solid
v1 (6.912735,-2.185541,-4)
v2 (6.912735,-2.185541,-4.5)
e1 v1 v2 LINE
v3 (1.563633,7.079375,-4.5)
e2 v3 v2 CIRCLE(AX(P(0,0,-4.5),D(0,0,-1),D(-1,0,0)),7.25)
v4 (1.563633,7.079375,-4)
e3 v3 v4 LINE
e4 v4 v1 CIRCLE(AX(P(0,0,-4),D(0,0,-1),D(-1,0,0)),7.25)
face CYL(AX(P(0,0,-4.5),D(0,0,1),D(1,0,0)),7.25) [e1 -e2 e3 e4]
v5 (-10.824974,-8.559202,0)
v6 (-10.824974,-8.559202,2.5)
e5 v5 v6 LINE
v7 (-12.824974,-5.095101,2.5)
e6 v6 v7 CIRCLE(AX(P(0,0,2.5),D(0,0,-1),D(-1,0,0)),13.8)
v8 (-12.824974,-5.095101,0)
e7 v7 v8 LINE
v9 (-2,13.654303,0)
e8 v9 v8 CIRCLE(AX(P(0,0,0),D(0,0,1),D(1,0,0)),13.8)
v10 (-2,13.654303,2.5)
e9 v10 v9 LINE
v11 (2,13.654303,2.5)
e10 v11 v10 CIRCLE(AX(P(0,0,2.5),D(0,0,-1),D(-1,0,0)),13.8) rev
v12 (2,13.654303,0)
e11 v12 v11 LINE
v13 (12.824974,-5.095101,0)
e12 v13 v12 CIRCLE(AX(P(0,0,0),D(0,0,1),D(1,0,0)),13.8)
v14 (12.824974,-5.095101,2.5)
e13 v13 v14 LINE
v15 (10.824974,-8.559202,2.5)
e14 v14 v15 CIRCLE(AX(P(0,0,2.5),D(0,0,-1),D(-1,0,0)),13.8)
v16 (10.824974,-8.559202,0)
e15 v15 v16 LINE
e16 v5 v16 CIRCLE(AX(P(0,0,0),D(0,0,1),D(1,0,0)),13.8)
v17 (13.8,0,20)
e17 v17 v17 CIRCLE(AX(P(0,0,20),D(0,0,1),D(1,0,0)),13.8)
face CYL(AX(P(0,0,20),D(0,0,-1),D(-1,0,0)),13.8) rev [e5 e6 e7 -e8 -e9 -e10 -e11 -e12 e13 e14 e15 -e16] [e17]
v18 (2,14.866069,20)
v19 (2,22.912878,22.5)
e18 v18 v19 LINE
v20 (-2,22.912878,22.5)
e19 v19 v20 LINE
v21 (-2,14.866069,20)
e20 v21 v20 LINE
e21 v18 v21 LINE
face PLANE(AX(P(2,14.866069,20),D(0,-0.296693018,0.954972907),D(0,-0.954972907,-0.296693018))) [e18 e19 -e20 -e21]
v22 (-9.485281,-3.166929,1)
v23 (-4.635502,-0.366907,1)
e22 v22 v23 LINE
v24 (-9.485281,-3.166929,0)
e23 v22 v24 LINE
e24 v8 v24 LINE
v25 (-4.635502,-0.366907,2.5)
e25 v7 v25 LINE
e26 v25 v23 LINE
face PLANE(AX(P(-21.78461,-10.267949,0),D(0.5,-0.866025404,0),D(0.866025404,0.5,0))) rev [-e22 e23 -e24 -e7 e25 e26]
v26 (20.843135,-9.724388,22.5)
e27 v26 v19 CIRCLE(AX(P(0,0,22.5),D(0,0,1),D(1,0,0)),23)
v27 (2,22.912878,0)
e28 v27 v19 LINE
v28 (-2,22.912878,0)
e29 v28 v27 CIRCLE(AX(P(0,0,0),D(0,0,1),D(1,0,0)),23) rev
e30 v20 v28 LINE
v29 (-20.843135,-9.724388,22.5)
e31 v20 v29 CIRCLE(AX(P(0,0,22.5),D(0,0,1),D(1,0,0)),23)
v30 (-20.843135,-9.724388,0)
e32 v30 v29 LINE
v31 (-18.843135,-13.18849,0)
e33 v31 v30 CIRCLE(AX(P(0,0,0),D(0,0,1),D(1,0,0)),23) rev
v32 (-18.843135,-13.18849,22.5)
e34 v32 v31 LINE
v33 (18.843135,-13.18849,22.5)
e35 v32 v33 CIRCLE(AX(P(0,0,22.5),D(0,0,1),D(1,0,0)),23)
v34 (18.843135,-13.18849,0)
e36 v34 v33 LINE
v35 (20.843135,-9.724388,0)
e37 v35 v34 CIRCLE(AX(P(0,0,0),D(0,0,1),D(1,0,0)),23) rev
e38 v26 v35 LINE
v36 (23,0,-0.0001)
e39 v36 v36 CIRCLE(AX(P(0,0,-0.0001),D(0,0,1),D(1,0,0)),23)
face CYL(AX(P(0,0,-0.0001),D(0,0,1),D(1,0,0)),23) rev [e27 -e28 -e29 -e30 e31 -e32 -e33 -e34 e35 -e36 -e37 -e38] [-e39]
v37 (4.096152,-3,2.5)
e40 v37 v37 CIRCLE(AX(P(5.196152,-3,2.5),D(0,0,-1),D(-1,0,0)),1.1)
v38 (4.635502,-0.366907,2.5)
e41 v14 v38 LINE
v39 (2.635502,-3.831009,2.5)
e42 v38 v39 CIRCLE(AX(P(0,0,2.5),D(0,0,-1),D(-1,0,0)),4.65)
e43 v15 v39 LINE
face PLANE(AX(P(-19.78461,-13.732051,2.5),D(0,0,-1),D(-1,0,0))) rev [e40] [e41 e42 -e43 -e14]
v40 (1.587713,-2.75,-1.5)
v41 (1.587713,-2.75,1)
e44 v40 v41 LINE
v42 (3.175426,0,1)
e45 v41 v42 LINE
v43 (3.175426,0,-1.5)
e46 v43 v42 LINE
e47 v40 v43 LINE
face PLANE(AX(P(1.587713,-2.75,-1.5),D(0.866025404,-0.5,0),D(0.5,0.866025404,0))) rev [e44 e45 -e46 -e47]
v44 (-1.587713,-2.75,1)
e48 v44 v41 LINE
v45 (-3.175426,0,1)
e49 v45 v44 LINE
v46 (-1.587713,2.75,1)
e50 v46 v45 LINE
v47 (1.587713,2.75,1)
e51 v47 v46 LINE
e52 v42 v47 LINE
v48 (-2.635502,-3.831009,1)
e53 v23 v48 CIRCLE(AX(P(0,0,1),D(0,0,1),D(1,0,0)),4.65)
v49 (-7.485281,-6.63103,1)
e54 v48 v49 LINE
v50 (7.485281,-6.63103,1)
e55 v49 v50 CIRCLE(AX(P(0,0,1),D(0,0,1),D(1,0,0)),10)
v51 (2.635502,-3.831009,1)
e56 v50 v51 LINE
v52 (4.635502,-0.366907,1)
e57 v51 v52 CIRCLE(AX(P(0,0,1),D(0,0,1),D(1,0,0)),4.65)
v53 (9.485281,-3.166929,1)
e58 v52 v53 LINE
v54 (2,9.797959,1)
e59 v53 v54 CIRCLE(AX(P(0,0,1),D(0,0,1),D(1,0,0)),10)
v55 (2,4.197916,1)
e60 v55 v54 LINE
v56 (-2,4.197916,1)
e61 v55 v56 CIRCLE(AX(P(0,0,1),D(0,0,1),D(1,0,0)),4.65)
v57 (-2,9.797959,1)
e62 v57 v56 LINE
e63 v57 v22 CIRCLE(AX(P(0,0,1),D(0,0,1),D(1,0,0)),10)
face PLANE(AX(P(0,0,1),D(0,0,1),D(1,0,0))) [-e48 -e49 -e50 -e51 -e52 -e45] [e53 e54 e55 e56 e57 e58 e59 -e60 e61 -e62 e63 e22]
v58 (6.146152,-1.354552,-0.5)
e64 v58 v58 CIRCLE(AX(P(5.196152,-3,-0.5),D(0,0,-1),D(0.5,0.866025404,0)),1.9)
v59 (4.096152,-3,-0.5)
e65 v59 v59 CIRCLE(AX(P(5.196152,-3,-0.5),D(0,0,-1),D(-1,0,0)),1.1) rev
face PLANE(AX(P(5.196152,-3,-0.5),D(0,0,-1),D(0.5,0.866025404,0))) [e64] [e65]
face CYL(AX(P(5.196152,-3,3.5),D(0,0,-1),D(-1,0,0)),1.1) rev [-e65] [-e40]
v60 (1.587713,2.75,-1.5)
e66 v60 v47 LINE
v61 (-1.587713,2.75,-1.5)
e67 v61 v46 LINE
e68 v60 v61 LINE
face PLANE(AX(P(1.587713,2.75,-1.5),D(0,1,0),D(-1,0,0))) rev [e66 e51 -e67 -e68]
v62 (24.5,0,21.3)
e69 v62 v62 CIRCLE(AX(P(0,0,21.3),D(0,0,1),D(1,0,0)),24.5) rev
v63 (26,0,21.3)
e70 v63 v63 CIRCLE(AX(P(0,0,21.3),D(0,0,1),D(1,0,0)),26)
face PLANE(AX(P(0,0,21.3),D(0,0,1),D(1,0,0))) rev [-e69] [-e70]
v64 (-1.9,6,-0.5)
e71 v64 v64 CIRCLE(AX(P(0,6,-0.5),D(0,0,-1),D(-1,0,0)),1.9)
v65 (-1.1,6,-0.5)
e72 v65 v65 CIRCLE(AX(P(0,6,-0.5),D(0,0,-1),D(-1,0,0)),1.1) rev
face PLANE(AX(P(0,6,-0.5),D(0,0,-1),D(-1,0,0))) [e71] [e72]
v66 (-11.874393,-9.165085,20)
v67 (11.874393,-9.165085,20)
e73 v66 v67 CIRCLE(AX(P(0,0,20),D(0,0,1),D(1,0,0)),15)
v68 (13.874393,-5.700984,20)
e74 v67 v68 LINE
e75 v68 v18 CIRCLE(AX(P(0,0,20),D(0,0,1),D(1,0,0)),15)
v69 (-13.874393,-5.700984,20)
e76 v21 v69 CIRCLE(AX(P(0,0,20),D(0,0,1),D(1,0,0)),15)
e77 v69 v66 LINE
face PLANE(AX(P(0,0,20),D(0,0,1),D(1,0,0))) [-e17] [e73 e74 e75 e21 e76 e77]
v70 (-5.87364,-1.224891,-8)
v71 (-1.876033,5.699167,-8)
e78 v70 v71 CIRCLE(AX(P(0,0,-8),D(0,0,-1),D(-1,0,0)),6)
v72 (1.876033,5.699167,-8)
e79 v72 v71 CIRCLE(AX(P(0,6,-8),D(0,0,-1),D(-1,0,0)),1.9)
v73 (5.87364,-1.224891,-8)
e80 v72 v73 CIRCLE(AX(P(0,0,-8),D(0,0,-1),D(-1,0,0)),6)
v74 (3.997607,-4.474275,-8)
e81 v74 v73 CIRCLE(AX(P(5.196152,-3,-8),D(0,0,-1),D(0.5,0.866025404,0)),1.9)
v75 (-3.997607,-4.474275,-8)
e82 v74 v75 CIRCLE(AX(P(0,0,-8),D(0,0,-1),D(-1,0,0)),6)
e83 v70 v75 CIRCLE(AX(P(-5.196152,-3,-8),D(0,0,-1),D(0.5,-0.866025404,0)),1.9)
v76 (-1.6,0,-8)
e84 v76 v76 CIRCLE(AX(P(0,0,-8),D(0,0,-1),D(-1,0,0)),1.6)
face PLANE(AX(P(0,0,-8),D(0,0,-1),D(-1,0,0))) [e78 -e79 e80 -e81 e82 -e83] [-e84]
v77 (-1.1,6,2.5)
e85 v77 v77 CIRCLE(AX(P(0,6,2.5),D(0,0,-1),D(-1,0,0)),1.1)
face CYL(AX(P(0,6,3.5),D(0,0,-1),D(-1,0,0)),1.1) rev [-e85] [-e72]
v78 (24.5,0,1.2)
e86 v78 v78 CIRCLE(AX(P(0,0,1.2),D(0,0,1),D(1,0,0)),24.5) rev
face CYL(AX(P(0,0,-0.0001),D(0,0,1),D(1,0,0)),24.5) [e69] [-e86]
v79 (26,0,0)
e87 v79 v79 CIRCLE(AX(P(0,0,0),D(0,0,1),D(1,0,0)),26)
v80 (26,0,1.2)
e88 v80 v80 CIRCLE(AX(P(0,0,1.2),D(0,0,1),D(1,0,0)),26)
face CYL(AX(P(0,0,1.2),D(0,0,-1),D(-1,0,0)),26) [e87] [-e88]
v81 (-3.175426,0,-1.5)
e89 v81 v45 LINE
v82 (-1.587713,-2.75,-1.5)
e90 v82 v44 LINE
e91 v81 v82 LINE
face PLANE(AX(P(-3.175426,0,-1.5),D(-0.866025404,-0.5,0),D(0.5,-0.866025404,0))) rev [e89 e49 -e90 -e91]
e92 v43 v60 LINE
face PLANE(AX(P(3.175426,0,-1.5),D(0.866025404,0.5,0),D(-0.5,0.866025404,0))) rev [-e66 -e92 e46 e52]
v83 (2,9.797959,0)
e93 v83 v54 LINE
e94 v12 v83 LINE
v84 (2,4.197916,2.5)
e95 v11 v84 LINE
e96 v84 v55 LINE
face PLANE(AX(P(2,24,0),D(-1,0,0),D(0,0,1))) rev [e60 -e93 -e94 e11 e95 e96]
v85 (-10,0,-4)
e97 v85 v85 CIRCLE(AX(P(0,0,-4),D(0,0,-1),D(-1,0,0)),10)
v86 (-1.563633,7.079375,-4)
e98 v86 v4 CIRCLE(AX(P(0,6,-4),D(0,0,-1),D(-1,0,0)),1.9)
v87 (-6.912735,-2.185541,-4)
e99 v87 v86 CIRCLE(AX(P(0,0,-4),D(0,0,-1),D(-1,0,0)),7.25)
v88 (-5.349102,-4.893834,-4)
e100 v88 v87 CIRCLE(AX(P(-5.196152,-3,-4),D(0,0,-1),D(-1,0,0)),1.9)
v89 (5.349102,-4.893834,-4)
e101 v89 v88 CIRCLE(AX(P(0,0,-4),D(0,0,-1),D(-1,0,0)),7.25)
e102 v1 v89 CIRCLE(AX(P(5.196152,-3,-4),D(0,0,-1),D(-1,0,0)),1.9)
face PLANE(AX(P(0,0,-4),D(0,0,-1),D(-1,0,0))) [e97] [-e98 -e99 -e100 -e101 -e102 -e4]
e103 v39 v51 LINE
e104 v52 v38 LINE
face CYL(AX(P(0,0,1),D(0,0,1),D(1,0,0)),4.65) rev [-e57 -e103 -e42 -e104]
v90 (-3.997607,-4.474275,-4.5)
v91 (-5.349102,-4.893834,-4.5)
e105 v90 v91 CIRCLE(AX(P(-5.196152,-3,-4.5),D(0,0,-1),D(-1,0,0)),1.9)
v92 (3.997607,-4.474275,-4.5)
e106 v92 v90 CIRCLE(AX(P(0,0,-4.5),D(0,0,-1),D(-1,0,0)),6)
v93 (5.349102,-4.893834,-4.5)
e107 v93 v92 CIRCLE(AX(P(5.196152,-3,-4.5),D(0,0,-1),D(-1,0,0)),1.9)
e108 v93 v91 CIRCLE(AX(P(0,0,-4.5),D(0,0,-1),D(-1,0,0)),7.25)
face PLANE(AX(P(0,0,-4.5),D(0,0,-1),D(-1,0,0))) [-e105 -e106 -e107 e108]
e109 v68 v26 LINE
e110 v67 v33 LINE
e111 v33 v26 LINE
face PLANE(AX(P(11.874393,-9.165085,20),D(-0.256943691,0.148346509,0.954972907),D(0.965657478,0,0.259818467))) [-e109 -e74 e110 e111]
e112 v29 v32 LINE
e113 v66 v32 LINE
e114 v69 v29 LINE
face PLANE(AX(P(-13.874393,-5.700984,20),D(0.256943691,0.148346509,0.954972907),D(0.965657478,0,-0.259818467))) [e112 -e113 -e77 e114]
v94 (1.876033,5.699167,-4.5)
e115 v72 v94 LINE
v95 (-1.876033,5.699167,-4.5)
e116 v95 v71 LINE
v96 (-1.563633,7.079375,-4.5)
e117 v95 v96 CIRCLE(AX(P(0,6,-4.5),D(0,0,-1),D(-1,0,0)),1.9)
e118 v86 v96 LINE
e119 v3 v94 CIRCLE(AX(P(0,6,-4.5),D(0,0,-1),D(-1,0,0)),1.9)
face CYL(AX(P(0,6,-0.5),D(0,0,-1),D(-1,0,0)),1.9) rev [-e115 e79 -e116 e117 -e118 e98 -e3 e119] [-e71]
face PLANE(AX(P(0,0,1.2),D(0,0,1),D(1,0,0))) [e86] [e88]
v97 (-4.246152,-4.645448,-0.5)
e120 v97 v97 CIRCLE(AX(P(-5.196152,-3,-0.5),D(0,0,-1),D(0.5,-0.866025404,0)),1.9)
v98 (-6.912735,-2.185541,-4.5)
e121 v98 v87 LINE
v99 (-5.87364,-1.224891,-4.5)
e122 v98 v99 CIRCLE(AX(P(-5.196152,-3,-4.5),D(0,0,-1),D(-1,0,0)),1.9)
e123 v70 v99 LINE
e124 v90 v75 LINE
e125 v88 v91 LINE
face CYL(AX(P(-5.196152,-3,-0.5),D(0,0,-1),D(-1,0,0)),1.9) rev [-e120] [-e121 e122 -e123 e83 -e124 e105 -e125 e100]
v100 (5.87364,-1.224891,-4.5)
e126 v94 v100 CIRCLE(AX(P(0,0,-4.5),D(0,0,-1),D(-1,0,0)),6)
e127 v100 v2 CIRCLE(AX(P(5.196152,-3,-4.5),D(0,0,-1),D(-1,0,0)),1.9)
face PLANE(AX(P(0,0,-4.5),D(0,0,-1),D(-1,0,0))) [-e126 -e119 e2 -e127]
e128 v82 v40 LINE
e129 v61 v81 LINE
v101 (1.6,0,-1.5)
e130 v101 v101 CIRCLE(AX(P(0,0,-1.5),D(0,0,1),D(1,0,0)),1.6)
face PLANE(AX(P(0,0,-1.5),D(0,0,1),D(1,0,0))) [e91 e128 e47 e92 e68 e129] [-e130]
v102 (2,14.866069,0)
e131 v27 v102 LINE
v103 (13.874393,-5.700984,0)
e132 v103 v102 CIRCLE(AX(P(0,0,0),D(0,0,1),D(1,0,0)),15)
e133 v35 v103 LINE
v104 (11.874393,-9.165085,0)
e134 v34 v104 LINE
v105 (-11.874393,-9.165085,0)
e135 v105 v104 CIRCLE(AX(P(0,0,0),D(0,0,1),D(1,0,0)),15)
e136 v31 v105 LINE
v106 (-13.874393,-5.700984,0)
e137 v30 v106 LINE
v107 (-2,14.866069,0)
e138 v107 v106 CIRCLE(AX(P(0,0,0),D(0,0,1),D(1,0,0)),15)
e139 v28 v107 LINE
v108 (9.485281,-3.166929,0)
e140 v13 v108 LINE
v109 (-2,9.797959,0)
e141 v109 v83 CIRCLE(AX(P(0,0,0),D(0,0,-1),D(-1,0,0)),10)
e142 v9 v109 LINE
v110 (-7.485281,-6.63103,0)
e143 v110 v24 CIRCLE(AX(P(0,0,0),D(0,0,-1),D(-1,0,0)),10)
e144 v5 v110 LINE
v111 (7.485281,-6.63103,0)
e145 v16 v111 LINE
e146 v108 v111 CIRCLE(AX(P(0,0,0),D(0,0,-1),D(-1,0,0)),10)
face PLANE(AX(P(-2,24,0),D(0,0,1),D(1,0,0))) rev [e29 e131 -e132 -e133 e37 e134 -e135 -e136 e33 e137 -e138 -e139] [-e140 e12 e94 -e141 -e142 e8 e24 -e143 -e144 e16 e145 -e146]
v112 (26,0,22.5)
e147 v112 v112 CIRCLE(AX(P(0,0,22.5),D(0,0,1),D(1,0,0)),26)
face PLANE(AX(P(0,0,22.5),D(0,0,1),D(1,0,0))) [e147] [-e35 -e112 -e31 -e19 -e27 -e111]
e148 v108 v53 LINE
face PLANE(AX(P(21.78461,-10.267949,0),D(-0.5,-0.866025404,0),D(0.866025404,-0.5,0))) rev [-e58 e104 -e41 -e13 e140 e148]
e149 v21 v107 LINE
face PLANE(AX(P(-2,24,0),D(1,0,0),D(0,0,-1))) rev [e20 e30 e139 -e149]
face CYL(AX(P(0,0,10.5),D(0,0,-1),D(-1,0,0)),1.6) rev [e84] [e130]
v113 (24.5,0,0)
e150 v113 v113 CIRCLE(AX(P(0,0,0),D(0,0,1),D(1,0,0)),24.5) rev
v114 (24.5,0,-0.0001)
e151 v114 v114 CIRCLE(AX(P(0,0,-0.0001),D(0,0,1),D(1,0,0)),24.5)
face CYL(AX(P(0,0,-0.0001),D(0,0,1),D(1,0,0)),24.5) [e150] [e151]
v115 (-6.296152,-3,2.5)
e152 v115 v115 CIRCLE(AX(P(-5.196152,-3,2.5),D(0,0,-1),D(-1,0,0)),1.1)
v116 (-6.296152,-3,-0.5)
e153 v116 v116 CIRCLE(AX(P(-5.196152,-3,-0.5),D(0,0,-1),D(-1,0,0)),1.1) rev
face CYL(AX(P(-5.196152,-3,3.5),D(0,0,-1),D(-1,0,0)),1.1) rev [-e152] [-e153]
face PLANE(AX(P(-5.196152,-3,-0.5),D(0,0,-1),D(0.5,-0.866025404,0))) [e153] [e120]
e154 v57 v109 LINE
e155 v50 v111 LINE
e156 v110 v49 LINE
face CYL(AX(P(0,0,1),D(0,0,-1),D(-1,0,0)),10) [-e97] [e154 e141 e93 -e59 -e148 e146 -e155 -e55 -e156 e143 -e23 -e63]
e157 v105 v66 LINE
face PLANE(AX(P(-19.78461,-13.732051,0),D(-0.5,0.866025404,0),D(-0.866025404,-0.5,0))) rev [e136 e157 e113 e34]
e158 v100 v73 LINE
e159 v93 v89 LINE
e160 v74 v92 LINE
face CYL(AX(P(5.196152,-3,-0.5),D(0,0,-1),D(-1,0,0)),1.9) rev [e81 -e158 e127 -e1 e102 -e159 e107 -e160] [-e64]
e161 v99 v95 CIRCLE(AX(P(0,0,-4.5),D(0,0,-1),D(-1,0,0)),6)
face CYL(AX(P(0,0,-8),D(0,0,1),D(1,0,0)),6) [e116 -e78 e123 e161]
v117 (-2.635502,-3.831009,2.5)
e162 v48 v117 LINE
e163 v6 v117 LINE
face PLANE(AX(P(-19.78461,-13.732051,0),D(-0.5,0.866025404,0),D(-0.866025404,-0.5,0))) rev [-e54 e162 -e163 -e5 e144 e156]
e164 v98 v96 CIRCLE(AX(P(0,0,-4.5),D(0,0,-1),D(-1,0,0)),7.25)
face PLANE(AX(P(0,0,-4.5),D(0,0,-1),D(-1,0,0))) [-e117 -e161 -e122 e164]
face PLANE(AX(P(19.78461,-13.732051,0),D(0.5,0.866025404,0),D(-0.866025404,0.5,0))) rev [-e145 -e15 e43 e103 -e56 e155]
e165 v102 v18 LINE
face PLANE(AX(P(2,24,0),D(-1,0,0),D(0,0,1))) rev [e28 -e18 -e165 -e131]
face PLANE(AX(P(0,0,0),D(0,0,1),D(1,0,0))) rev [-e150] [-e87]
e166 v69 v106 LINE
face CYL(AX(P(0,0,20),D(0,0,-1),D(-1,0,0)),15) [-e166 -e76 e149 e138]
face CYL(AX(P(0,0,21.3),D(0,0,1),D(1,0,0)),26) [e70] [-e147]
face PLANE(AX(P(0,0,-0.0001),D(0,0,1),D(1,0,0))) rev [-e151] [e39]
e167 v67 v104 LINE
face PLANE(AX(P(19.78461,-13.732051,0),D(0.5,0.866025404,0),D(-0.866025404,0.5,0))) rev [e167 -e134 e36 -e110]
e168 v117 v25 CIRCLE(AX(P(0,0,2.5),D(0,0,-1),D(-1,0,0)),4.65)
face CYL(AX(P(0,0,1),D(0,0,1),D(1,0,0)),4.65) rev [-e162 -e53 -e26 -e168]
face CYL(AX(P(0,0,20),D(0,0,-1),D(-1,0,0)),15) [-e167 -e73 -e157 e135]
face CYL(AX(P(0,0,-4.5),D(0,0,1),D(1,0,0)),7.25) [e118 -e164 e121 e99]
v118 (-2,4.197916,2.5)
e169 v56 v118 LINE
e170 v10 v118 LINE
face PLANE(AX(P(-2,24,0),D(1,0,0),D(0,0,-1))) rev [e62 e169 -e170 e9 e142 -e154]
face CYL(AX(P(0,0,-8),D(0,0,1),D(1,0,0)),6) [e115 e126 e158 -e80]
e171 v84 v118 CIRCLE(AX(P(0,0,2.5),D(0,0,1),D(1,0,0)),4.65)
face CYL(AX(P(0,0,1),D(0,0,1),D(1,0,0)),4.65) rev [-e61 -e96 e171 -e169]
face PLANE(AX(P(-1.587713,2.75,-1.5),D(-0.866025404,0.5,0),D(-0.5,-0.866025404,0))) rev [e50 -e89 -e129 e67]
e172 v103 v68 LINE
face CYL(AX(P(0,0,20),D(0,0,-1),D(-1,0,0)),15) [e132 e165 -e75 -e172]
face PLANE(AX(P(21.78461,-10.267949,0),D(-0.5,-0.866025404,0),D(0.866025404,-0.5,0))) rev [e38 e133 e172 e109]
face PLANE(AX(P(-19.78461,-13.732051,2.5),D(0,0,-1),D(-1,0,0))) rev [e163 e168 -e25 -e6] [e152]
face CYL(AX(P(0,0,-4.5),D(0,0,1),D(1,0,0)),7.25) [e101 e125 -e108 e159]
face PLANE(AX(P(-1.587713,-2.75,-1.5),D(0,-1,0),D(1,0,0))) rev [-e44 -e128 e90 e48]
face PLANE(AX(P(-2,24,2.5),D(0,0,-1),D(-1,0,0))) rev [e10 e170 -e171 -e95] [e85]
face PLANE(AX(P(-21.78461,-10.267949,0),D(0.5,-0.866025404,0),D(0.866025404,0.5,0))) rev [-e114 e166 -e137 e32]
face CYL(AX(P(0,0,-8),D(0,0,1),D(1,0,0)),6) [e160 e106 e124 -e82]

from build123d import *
from build123d.topology import SkipClean

# Parameters (mm, degrees)
BOSS_EXTRUDE1_DEPTH      = 22.5
BOSS_EXTRUDE1_DEPTH_BACK = 0.0001
SKETCH1_R                = 24.5
SKETCH1_R_2              = 23
SKETCH4_R                = 26
SKETCH4_R_2              = 23
BOSS_EXTRUDE2_DEPTH      = 1.2
BOSS_EXTRUDE4_START      = -1.2
SKETCH7_R                = 26
SKETCH7_R_2              = 24.253874055
BOSS_EXTRUDE4_DEPTH      = 1.2
SKETCH8_R                = 15
SKETCH8_R_2              = 13.8
BOSS_EXTRUDE5_DEPTH      = 20
SKETCH9_R                = 10
BOSS_EXTRUDE6_DEPTH      = 1
SKETCH11_W               = 4
SKETCH11_H               = 2.5
BOSS_EXTRUDE8_DEPTH      = 24
SKETCH19_W               = 4
SKETCH19_H               = 9.350394366
BOSS_EXTRUDE9_DEPTH      = 20
SKETCH13_R               = 4.65
CUT_EXTRUDE7_DEPTH       = 1.5
CIRPATTERN2_COUNT        = 3
SKETCH21_R               = 4.65
CUT_EXTRUDE8_DEPTH       = 1.5
CIRPATTERN6_COUNT        = 3
SKETCH23_R               = 1.1
CUT_EXTRUDE9_DEPTH       = 3.5
CIRPATTERN8_COUNT        = 3
CUT_EXTRUDE11_DEPTH      = 4
CIRPATTERN9_COUNT        = 3
BOSS_EXTRUDE10_START     = 4
SKETCH27_R               = 10
BOSS_EXTRUDE10_DEPTH     = 4
SKETCH29_R               = 6
BOSS_EXTRUDE11_DEPTH     = 4
CUT_EXTRUDE12_START      = -13
SKETCH30_R               = 1.1
CUT_EXTRUDE12_DEPTH      = 13
CUT_EXTRUDE13_START      = -13
SKETCH31_R               = 1.1
CUT_EXTRUDE13_DEPTH      = 13
SKETCH32_R               = 1.9
CUT_EXTRUDE14_DEPTH      = 7.5
CUT_EXTRUDE15_DEPTH      = 2.5
SKETCH36_R               = 1.6
CUT_EXTRUDE16_DEPTH      = 18.5
SKETCH40_R               = 7.25
BOSS_EXTRUDE13_DEPTH     = 0.5
SKETCH36_4_R             = 1.6
CUT_EXTRUDE17_DEPTH      = 8.5
SKETCH32_3_R             = 1.9
CUT_EXTRUDE18_DEPTH      = 4.5
CIRPATTERN10_COUNT       = 3


with BuildPart() as part:
    # Sketch1 → Boss-Extrude1 (new, two sides: drawn at the far end of the back side and taken through both)
    with BuildSketch(Plane.XY.offset(-BOSS_EXTRUDE1_DEPTH_BACK)):
        Circle(SKETCH1_R)
        Circle(SKETCH1_R_2, mode=Mode.SUBTRACT)
    extrude(amount=BOSS_EXTRUDE1_DEPTH + BOSS_EXTRUDE1_DEPTH_BACK)

    # Sketch4 → Boss-Extrude2 (add)
    with SkipClean():  # the faces are left unmerged after this step: merging them gives an invalid solid
        with BuildSketch(Plane.XY):
            Circle(SKETCH4_R)
            Circle(SKETCH4_R_2, mode=Mode.SUBTRACT)
        extrude(amount=BOSS_EXTRUDE2_DEPTH)

    # Sketch7 → Boss-Extrude4 (add)
    with SkipClean():  # the faces are left unmerged after this step: merging them gives an invalid solid
        with BuildSketch(Plane.XY.offset(22.5).offset(BOSS_EXTRUDE4_START)):
            Circle(SKETCH7_R)
            with Locations((-0.246125945, 0)):
                Circle(SKETCH7_R_2, mode=Mode.SUBTRACT)
        extrude(amount=BOSS_EXTRUDE4_DEPTH)



with BuildPart() as body_2:
    # Sketch8 → Boss-Extrude5 (new body)
    with BuildSketch(Plane.XY):
        Circle(SKETCH8_R)
        Circle(SKETCH8_R_2, mode=Mode.SUBTRACT)
    extrude(amount=BOSS_EXTRUDE5_DEPTH)


with BuildPart() as body_3:
    # Sketch9 → Boss-Extrude6 (new body)
    with BuildSketch(Plane.XY):
        Circle(SKETCH9_R)
    extrude(amount=BOSS_EXTRUDE6_DEPTH)


with BuildPart() as part_1:
    add(part.part)

    add(body_2.part)  # Boss-Extrude8 merges body 2

    add(body_3.part)  # Boss-Extrude8 merges body 3
    # Sketch11 → Boss-Extrude8 (add)
    with BuildSketch(Plane(origin=(0, 0, 0), x_dir=(1, 0, 0), z_dir=(0, 1, 0))):
        with Locations((0, -1.25)):
            Rectangle(SKETCH11_W, SKETCH11_H)
    boss_extrude8 = extrude(amount=BOSS_EXTRUDE8_DEPTH)

    # Sketch19 → Boss-Extrude9 (add, through all)
    with BuildSketch(Plane.XY.offset(2.5)):
        with Locations((0, 19.250315011)):
            Rectangle(SKETCH19_W, SKETCH19_H)
    boss_extrude9 = extrude(amount=BOSS_EXTRUDE9_DEPTH)

    # Sketch13 → Cut-Extrude7 (cut)
    with BuildSketch(Plane.XY.offset(2.5)):
        Circle(SKETCH13_R)
    extrude(amount=-CUT_EXTRUDE7_DEPTH, mode=Mode.SUBTRACT)

    # CirPattern2: Boss-Extrude8 ×3 about axis
    cirpattern2_axis = Axis((0, 0, 0), (0, 0, 1))
    for i in range(1, CIRPATTERN2_COUNT):
        add(boss_extrude8.rotate(cirpattern2_axis, i * 360 / CIRPATTERN2_COUNT))

    # Sketch21 → Cut-Extrude8 (cut)
    with BuildSketch(Plane.XY.offset(2.5)):
        Circle(SKETCH21_R)
    extrude(amount=-CUT_EXTRUDE8_DEPTH, mode=Mode.SUBTRACT)

    # CirPattern6: Boss-Extrude9 ×3 about axis
    cirpattern6_axis = Axis((0, 0, 0), (0, 0, 1))
    for i in range(1, CIRPATTERN6_COUNT):
        add(boss_extrude9.rotate(cirpattern6_axis, i * 360 / CIRPATTERN6_COUNT))

    # Sketch23 → Cut-Extrude9 (cut)
    with BuildSketch(Plane(origin=(0, 0, 0), x_dir=(-1, 0, 0), z_dir=(0, 0, -1))):
        with Locations((0, 6)):
            Circle(SKETCH23_R)
    cut_extrude9 = extrude(amount=-CUT_EXTRUDE9_DEPTH, mode=Mode.SUBTRACT)

    # CirPattern8: Cut-Extrude9 ×3 about axis
    cirpattern8_axis = Axis((0, 0, 0), (0, 0, 1))
    for i in range(1, CIRPATTERN8_COUNT):
        add(cut_extrude9.rotate(cirpattern8_axis, i * 360 / CIRPATTERN8_COUNT), mode=Mode.SUBTRACT)

    # Sketch20 → Cut-Extrude11 (cut)
    with BuildSketch(Plane.ZY.offset(2)):
        Polygon((20, 14.866068747), (22.5, 22.912878475), (22.5, 14.575117828), (20, 14.575117828), align=None)
    cut_extrude11 = extrude(amount=-CUT_EXTRUDE11_DEPTH, mode=Mode.SUBTRACT)

    # CirPattern9: Cut-Extrude11 ×3 about axis
    cirpattern9_axis = Axis((0, 0, 0), (0, 0, 1))
    for i in range(1, CIRPATTERN9_COUNT):
        add(cut_extrude11.rotate(cirpattern9_axis, i * 360 / CIRPATTERN9_COUNT), mode=Mode.SUBTRACT)

    # Sketch27 → Boss-Extrude10 (add)
    with BuildSketch(Plane(origin=(0, 0, 0), x_dir=(-1, 0, 0), z_dir=(0, 0, -1)).offset(BOSS_EXTRUDE10_START)):
        Circle(SKETCH27_R)
    extrude(amount=-BOSS_EXTRUDE10_DEPTH)

    # Sketch29 → Boss-Extrude11 (add)
    with BuildSketch(Plane(origin=(0, 0, -4), x_dir=(-1, 0, 0), z_dir=(0, 0, -1))):
        Circle(SKETCH29_R)
    extrude(amount=BOSS_EXTRUDE11_DEPTH)

    # Sketch30 → Cut-Extrude12 (cut)
    with BuildSketch(Plane.XY.offset(1).offset(CUT_EXTRUDE12_START)):
        with Locations(Location((0, 6, 0), (0, 0, 180))):
            Circle(SKETCH30_R)
    extrude(amount=CUT_EXTRUDE12_DEPTH, mode=Mode.SUBTRACT)

    # Sketch31 → Cut-Extrude13 (cut)
    with BuildSketch(Plane.XY.offset(1).offset(CUT_EXTRUDE13_START)):
        with Locations(Location((5.196152423, -3, 0), (0, 0, 180))):
            Circle(SKETCH31_R)
        with Locations(Location((-5.196152423, -3, 0), (0, 0, 180))):
            Circle(SKETCH31_R)
    extrude(amount=CUT_EXTRUDE13_DEPTH, mode=Mode.SUBTRACT)

    # Sketch32 → Cut-Extrude14 (cut)
    with SkipClean():  # the faces are left unmerged after this step: merging them gives an invalid solid
        with BuildSketch(Plane(origin=(0, 0, -8), x_dir=(-1, 0, 0), z_dir=(0, 0, -1))):
            with Locations((0, 6)):
                Circle(SKETCH32_R)
        cut_extrude14 = extrude(amount=-CUT_EXTRUDE14_DEPTH, mode=Mode.SUBTRACT)
    add(part_1.part.scale(1), mode=Mode.REPLACE)  # the faces are merged on a copy

    # Sketch35 → Cut-Extrude15 (cut)
    with BuildSketch(Plane.XY.offset(1)):
        Polygon((1.58771324, -2.75), (3.175426481, 0), (1.58771324, 2.75), (-1.58771324, 2.75), (-3.175426481, 0), (-1.58771324, -2.75), align=None)
    extrude(amount=-CUT_EXTRUDE15_DEPTH, mode=Mode.SUBTRACT)

    # Sketch36 → Cut-Extrude16 (cut)
    with BuildSketch(Plane(origin=(0, 0, -8), x_dir=(-1, 0, 0), z_dir=(0, 0, -1))):
        Circle(SKETCH36_R)
    extrude(amount=-CUT_EXTRUDE16_DEPTH, mode=Mode.SUBTRACT)

    # Sketch40 → Boss-Extrude13 (add)
    with BuildSketch(Plane(origin=(0, 0, -4), x_dir=(-1, 0, 0), z_dir=(0, 0, -1))):
        with Locations(Location((0, 0, 0), (0, 0, 102.455047825))):
            Circle(SKETCH40_R)
    extrude(amount=BOSS_EXTRUDE13_DEPTH)

    # Sketch36<4> → Cut-Extrude17 (cut)
    with BuildSketch(Plane(origin=(0, 0, -8), x_dir=(-1, 0, 0), z_dir=(0, 0, -1))):
        Circle(SKETCH36_4_R)
    extrude(amount=-CUT_EXTRUDE17_DEPTH, mode=Mode.SUBTRACT)

    # Sketch32<3> → Cut-Extrude18 (cut)
    with BuildSketch(Plane(origin=(0, 0, -8), x_dir=(-1, 0, 0), z_dir=(0, 0, -1))):
        with Locations((0, 6)):
            Circle(SKETCH32_3_R)
    extrude(amount=-CUT_EXTRUDE18_DEPTH, mode=Mode.SUBTRACT)

    # CirPattern10: Cut-Extrude14 ×3 about axis
    cirpattern10_axis = Axis((0, 0, 0), (0, 0, 1))
    for i in range(1, CIRPATTERN10_COUNT):
        add(cut_extrude14.rotate(cirpattern10_axis, i * 360 / CIRPATTERN10_COUNT), mode=Mode.SUBTRACT)


solid = part_1.part
